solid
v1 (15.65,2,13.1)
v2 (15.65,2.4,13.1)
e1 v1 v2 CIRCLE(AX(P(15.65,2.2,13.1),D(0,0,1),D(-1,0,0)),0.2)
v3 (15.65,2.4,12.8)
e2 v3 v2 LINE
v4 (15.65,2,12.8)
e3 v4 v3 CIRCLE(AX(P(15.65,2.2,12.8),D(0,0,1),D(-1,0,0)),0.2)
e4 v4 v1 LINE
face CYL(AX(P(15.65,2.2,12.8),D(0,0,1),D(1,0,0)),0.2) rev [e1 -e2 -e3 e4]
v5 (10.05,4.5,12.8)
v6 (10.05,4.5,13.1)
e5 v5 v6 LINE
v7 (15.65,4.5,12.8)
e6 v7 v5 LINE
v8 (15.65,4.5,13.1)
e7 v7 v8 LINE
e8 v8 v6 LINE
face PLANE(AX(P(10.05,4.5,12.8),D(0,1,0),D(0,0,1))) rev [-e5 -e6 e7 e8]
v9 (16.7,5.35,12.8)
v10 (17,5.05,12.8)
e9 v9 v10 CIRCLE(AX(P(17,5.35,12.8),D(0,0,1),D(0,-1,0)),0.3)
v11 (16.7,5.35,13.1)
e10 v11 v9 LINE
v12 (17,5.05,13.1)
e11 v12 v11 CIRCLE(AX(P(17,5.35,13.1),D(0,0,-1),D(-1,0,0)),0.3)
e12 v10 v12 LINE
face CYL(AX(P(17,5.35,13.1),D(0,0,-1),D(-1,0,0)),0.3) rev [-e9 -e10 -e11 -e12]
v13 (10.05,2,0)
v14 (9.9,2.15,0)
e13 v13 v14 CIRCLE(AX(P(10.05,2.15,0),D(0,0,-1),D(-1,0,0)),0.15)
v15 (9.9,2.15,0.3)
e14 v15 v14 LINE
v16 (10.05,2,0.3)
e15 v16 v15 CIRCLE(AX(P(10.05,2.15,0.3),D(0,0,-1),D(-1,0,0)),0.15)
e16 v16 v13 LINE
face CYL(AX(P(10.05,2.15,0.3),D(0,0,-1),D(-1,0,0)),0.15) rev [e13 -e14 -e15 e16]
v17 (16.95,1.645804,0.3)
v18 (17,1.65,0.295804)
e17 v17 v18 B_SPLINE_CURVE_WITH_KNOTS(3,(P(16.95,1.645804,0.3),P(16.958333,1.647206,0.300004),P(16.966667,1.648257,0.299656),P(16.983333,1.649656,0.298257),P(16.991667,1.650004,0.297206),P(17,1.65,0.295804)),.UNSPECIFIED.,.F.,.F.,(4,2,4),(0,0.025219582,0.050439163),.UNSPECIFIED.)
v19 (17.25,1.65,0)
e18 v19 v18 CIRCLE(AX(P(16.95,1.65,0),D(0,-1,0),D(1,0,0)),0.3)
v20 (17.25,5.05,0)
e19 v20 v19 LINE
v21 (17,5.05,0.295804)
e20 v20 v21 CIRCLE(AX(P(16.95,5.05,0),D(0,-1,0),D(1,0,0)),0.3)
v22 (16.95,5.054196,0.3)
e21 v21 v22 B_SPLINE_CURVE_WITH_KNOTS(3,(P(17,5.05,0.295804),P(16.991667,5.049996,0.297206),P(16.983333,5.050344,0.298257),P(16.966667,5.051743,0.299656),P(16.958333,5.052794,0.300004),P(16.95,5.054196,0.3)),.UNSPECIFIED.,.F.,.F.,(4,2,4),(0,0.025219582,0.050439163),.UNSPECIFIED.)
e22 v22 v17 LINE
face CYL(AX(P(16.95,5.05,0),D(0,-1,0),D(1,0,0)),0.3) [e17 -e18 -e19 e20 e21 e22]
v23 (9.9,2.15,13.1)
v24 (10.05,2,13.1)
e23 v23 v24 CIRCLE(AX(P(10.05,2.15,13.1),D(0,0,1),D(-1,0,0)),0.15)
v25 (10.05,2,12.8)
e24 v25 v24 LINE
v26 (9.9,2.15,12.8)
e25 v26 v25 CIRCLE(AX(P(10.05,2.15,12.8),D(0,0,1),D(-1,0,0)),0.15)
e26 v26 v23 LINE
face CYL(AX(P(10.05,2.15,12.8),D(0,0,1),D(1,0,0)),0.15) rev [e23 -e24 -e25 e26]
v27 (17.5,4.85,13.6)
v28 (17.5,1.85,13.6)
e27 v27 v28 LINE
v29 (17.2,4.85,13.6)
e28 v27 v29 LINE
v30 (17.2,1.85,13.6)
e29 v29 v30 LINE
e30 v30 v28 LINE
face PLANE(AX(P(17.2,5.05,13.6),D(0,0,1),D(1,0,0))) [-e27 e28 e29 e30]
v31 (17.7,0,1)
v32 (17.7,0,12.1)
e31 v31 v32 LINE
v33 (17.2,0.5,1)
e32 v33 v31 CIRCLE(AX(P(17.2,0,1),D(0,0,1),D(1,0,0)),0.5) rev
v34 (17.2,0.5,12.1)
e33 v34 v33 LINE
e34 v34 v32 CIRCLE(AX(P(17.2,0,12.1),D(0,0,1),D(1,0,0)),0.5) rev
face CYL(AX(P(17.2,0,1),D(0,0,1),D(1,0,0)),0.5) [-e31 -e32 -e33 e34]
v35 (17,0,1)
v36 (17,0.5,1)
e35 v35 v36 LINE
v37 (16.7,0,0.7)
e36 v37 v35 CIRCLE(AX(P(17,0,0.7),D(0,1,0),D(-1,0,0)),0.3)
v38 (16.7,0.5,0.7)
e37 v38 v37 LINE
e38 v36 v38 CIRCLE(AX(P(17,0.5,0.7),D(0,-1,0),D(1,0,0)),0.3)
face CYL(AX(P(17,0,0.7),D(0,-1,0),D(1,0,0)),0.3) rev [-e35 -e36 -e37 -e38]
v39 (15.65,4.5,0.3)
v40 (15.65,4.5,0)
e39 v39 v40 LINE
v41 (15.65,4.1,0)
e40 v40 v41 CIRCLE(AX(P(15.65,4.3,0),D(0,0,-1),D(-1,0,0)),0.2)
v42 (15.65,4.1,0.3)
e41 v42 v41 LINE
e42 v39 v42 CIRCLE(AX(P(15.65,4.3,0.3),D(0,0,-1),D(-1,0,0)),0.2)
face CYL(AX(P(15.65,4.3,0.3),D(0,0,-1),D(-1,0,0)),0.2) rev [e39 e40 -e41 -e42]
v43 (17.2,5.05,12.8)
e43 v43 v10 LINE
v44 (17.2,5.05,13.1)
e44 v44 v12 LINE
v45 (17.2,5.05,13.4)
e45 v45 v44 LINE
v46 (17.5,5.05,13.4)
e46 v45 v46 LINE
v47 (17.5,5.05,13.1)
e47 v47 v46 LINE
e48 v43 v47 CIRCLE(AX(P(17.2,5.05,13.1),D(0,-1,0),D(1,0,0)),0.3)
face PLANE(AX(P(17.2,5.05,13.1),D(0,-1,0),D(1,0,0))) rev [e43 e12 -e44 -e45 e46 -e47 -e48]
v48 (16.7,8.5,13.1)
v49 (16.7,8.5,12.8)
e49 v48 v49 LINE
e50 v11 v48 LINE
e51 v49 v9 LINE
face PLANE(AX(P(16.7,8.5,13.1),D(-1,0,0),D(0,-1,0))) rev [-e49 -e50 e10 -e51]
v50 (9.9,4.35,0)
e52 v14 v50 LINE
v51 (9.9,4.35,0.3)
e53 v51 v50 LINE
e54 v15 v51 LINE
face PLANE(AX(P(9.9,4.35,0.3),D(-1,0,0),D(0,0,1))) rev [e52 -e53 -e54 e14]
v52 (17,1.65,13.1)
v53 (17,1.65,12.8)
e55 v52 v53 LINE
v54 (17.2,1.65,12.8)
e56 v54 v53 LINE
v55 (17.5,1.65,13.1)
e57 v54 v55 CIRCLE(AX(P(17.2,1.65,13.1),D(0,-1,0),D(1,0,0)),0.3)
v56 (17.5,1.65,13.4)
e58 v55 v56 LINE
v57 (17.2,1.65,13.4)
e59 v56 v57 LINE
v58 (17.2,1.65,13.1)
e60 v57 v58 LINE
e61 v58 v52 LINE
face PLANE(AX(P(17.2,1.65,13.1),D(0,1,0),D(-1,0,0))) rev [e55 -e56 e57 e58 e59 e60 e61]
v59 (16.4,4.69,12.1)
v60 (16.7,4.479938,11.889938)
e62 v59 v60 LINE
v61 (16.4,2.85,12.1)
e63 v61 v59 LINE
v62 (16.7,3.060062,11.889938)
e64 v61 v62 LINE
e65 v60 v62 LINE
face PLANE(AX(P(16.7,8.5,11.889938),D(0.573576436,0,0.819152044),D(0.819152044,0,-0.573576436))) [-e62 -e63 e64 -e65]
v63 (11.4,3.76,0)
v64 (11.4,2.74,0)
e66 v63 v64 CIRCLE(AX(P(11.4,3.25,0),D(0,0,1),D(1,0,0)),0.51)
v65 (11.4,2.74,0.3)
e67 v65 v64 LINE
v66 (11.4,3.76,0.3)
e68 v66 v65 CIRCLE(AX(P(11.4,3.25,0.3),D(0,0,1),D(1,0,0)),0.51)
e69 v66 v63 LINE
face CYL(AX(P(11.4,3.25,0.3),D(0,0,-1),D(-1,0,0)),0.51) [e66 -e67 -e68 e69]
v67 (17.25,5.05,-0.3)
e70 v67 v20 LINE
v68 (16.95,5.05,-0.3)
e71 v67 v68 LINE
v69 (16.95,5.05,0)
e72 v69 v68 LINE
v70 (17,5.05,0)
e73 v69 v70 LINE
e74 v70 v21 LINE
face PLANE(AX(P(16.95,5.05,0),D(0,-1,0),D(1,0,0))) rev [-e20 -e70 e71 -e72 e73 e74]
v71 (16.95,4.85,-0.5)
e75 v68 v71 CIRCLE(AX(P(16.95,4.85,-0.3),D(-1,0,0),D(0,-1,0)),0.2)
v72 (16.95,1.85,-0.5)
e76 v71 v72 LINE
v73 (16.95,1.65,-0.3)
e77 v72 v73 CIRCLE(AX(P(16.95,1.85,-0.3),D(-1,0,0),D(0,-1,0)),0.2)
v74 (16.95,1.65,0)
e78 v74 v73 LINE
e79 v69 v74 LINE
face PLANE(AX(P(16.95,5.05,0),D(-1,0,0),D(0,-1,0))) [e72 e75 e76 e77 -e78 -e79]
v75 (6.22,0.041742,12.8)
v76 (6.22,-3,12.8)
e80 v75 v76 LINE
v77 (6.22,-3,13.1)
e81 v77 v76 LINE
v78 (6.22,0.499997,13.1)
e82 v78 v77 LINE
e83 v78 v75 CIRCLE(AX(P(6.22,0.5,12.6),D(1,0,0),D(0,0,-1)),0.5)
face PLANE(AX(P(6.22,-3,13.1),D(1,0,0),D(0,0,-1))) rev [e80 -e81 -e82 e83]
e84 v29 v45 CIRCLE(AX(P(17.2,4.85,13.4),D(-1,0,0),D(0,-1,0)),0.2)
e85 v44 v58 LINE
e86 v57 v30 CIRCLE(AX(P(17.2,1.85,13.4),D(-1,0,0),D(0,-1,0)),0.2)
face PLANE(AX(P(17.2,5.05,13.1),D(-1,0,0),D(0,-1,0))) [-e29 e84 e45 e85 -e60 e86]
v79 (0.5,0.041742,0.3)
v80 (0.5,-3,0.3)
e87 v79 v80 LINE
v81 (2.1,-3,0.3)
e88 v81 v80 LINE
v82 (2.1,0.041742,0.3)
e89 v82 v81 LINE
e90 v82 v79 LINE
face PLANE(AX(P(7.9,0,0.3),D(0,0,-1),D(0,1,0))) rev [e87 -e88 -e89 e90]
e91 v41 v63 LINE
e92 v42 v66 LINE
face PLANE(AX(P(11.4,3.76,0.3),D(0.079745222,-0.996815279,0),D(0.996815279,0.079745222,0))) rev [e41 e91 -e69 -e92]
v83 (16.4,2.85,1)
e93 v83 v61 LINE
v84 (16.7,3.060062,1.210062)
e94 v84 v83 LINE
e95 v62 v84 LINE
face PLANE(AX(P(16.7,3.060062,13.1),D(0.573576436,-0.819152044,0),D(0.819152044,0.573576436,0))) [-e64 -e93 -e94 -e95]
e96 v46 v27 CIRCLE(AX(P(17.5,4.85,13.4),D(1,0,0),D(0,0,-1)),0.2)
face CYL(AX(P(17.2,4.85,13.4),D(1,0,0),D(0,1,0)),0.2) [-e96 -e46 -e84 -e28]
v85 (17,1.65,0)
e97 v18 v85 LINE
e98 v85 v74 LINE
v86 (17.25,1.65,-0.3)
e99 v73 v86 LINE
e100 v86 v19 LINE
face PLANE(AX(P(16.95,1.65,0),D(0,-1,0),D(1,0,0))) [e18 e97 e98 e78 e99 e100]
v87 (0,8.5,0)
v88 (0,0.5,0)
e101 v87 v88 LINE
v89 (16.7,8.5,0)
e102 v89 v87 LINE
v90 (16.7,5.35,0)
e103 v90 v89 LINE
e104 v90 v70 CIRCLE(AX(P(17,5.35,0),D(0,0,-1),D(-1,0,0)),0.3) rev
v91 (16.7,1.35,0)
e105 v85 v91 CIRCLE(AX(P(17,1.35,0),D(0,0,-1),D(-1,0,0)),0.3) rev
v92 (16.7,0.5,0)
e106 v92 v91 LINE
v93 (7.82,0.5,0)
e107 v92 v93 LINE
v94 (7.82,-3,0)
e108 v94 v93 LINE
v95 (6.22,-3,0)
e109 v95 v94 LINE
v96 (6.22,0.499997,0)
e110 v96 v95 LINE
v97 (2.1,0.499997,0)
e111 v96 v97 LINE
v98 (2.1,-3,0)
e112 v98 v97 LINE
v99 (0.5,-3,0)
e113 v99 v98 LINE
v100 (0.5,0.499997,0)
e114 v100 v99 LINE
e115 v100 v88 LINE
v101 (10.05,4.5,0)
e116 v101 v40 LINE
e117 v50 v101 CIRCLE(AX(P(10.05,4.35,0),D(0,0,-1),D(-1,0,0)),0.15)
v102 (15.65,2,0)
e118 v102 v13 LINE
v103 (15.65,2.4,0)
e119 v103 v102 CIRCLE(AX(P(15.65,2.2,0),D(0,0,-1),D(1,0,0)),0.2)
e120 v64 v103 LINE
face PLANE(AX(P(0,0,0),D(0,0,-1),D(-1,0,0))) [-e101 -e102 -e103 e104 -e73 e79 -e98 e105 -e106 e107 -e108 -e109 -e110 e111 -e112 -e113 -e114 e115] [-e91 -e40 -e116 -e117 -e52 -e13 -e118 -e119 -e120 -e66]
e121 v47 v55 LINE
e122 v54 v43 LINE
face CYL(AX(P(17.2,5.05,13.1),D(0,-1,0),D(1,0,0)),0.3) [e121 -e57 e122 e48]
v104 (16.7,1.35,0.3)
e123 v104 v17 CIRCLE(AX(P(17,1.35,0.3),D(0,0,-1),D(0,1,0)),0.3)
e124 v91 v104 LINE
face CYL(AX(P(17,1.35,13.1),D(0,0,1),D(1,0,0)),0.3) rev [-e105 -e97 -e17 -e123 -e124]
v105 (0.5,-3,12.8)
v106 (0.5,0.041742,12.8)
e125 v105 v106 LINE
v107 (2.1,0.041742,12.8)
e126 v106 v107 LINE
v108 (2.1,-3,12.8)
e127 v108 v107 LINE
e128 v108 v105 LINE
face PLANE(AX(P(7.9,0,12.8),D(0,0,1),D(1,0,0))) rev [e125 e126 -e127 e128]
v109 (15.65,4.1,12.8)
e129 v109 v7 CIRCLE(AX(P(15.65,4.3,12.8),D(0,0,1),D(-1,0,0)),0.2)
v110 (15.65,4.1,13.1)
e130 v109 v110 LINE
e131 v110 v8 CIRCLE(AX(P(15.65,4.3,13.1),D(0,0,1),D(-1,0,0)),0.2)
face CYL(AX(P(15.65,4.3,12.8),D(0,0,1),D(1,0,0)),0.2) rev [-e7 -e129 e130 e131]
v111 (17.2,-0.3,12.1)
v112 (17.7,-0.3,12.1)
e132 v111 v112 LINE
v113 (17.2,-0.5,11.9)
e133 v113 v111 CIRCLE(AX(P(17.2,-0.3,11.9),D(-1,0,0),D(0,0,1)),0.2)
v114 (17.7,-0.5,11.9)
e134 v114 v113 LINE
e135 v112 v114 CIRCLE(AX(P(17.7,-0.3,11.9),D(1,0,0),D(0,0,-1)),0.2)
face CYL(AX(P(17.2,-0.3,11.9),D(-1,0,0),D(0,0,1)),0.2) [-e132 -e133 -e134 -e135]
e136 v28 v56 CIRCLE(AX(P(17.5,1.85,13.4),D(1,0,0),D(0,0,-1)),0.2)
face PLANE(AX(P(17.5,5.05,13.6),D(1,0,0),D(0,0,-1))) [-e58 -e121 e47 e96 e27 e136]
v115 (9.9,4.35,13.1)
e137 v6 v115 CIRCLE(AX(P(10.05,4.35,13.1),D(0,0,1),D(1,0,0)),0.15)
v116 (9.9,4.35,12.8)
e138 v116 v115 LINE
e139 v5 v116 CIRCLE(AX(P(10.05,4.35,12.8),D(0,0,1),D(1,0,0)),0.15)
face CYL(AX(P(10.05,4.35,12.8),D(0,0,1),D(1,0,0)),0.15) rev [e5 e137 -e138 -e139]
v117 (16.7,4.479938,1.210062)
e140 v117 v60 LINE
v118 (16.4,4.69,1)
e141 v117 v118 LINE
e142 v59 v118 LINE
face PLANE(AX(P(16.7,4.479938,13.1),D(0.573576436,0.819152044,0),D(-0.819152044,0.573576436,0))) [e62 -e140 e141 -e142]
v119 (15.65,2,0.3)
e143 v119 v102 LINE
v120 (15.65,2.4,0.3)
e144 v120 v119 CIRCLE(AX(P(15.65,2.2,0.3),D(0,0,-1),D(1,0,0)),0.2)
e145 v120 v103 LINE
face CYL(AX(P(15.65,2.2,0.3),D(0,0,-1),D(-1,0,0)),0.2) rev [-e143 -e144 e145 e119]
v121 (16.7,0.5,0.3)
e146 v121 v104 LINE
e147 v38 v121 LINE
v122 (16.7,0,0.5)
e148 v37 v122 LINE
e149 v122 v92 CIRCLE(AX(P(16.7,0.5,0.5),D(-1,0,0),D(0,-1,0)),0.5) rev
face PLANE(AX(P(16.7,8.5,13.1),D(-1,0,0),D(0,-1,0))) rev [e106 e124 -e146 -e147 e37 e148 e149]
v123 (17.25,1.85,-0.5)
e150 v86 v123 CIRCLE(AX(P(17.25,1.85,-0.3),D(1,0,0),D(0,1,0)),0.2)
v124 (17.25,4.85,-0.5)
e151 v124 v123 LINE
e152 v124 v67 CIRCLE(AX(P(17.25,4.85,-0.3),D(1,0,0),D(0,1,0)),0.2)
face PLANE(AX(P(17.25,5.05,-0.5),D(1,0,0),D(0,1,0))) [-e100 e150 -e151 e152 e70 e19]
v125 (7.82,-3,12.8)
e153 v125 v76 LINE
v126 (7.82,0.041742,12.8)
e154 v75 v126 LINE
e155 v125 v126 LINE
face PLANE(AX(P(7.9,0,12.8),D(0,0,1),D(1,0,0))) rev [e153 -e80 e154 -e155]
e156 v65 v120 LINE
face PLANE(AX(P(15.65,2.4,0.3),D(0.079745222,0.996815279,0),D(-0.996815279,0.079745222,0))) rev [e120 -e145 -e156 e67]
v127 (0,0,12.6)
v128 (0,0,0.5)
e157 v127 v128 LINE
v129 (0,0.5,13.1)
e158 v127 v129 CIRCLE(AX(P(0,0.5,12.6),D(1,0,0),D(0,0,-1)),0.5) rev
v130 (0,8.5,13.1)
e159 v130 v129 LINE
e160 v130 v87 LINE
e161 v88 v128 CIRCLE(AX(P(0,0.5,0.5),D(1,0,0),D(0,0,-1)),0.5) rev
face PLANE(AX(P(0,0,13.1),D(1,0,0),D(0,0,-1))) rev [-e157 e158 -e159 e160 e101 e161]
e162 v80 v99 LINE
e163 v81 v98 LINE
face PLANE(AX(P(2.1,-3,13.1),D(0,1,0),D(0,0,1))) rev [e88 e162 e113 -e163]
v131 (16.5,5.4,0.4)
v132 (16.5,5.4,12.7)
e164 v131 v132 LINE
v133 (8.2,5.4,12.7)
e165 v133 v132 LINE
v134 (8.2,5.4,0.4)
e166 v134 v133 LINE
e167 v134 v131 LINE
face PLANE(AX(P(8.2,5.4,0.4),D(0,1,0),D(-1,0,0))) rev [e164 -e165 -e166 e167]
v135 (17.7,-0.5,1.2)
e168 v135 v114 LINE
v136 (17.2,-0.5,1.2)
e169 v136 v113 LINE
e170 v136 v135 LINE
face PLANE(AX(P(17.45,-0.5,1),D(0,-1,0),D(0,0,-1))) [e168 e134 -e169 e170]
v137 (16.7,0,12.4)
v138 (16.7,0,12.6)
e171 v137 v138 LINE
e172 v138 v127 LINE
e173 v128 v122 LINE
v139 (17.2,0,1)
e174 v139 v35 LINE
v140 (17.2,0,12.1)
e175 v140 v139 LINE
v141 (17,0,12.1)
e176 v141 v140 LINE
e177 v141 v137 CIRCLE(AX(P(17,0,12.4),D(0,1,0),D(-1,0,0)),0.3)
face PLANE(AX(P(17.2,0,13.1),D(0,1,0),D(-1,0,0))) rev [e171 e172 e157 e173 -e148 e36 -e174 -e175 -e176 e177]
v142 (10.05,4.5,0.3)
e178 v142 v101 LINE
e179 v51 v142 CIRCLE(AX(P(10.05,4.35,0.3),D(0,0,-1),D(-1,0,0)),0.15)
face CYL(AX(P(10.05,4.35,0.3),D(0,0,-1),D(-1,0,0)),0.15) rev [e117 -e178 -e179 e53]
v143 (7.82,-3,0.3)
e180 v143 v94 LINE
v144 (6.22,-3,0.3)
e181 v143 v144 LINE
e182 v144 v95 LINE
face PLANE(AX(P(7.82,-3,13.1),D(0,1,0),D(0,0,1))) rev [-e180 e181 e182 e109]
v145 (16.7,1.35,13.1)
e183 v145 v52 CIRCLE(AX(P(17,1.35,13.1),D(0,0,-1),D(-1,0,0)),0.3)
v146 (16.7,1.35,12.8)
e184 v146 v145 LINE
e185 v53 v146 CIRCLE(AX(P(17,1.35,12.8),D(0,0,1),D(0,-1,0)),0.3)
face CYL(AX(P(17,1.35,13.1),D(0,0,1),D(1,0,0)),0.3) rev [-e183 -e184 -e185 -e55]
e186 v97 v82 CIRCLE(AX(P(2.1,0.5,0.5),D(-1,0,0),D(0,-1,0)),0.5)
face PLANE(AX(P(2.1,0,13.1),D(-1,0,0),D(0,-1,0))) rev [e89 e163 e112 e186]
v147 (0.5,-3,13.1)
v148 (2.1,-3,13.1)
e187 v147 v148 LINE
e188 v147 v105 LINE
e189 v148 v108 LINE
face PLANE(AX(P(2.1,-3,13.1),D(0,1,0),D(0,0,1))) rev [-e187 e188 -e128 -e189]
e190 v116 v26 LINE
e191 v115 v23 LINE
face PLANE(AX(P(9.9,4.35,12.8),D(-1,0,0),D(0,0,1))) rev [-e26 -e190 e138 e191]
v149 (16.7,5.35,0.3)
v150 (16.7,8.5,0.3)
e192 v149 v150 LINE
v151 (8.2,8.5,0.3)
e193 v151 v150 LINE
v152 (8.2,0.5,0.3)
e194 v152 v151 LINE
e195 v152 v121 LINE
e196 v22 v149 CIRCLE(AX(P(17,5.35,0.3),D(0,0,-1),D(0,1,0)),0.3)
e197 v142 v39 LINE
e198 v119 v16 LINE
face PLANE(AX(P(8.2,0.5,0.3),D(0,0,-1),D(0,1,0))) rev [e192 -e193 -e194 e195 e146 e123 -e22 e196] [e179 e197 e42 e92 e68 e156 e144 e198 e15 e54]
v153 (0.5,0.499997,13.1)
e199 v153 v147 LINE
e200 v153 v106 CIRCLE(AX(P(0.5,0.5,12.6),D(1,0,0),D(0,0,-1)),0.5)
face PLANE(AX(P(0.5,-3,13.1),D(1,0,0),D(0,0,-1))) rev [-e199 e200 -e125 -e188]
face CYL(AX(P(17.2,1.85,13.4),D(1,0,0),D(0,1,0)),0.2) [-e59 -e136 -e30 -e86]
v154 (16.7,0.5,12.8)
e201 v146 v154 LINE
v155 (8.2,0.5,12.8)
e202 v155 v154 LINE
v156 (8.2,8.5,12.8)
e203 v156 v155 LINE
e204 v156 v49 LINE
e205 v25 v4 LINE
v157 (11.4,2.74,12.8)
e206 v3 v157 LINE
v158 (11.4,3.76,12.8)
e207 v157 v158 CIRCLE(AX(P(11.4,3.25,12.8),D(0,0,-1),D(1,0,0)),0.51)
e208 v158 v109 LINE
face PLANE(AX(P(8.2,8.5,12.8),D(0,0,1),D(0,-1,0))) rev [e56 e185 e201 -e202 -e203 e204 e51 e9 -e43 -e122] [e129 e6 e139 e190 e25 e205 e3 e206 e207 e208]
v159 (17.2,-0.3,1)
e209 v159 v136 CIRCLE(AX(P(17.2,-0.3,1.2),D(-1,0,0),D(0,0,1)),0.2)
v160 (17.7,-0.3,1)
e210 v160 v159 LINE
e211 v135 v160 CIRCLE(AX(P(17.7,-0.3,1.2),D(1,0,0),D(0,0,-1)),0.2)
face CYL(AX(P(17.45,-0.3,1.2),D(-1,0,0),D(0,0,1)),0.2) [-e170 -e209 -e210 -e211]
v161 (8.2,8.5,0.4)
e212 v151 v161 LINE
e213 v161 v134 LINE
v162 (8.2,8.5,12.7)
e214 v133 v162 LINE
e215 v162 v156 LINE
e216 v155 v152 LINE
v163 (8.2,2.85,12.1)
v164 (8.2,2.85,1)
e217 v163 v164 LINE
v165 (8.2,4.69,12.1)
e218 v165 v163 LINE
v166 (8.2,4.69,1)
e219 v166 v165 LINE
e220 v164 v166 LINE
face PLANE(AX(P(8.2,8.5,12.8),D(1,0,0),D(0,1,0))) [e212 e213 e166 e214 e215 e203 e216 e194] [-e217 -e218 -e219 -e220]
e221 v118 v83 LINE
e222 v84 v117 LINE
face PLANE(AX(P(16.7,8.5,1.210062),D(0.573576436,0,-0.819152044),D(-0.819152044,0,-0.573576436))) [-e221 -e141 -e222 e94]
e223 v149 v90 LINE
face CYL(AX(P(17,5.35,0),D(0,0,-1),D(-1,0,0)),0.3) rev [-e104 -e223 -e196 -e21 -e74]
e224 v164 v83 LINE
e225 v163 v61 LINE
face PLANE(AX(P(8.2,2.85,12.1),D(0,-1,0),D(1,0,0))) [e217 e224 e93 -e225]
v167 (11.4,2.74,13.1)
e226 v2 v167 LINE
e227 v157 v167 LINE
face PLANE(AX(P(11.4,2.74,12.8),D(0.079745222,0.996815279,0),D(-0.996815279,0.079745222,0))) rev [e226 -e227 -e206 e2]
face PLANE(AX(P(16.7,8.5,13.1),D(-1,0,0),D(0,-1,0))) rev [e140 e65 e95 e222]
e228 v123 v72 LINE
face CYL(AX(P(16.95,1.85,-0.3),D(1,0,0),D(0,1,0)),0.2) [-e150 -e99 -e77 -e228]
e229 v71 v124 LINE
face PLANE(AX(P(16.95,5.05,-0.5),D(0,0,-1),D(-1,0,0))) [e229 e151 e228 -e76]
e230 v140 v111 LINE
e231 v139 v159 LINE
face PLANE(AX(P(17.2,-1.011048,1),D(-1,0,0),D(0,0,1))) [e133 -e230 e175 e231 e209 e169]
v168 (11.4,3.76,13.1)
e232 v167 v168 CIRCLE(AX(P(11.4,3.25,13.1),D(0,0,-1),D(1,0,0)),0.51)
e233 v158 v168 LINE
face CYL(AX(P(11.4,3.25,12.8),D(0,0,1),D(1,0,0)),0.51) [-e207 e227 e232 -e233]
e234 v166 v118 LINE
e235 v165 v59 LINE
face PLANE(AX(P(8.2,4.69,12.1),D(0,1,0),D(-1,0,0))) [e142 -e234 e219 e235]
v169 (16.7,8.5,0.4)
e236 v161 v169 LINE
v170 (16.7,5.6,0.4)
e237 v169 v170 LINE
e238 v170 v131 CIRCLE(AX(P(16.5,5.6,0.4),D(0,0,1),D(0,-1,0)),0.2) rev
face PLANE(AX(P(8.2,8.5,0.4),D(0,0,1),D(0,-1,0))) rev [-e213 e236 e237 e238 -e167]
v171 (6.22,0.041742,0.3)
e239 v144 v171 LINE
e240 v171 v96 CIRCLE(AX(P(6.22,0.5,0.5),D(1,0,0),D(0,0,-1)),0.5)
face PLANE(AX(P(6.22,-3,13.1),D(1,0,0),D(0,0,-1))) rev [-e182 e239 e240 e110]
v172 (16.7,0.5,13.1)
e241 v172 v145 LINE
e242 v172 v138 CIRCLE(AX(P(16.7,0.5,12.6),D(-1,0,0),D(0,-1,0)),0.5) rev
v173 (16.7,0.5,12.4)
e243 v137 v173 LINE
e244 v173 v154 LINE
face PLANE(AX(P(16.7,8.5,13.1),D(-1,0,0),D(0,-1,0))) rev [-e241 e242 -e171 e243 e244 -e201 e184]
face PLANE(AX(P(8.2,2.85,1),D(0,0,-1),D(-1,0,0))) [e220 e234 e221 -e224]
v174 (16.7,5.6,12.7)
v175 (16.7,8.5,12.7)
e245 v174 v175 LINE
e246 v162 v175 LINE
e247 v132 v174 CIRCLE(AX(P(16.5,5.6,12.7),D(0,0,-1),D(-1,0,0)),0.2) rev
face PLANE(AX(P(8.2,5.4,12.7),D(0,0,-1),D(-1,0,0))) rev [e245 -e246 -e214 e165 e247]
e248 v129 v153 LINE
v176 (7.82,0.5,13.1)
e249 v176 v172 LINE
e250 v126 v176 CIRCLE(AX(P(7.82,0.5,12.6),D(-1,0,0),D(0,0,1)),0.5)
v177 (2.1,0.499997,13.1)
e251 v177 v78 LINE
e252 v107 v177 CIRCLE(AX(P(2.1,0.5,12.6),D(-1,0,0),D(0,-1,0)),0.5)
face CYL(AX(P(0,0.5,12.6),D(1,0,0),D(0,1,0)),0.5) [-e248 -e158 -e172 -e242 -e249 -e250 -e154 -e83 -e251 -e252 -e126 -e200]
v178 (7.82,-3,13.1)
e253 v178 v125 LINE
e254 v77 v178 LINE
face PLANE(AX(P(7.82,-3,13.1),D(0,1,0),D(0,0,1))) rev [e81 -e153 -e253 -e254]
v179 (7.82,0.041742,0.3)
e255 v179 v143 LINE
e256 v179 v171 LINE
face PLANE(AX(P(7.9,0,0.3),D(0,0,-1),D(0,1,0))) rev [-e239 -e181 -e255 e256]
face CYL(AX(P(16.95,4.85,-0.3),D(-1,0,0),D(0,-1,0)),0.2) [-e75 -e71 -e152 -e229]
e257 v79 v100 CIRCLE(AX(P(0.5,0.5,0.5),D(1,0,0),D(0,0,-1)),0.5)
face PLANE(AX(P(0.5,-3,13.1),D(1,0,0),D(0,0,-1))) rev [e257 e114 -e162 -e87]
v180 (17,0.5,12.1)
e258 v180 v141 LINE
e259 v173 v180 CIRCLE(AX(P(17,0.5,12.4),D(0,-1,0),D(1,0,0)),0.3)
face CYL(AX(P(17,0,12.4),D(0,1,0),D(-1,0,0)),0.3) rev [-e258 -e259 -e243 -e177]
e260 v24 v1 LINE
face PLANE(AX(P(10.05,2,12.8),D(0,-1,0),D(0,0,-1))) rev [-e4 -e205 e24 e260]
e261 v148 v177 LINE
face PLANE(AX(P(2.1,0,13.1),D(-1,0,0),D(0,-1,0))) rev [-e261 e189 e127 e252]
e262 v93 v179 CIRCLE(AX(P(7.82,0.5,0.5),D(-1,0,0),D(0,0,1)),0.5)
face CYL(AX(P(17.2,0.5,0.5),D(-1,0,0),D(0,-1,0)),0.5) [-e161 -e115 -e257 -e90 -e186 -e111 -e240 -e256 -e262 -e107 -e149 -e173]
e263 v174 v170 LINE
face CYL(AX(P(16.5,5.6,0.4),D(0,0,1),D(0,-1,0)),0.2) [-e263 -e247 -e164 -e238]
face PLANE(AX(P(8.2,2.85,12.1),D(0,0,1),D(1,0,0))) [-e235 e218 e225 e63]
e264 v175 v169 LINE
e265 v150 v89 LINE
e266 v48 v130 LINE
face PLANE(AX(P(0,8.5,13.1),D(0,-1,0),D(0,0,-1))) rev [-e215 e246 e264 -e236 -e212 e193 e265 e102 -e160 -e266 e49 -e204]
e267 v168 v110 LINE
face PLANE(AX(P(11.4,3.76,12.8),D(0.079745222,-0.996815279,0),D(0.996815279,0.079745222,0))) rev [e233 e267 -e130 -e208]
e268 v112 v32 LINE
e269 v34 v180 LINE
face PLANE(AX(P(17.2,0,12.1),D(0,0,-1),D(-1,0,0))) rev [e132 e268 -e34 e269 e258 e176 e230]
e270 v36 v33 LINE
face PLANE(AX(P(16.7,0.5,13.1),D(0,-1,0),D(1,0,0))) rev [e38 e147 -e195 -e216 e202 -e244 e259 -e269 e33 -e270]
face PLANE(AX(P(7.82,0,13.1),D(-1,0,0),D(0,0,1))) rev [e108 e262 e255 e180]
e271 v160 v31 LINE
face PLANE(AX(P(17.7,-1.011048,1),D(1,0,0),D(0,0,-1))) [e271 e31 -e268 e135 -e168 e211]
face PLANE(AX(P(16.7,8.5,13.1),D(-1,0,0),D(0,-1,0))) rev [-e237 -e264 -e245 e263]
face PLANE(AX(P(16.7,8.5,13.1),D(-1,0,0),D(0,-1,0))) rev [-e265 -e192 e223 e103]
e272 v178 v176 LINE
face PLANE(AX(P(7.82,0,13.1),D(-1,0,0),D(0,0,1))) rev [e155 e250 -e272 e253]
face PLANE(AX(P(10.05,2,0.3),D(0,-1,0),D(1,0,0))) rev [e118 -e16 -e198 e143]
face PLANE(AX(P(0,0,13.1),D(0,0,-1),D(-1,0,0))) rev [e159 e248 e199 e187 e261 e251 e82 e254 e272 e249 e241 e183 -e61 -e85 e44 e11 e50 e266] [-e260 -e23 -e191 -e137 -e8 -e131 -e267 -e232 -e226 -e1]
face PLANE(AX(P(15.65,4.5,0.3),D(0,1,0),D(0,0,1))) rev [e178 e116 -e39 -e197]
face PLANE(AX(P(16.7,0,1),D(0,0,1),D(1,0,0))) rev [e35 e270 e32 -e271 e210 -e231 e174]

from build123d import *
from OCP.BRepFilletAPI import BRepFilletAPI_MakeChamfer

# Parameters (mm, degrees)
BOSS_EXTRU_1_DEPTH      = 13.1
ESQUISSE2_W             = 12.5
ESQUISSE2_H             = 3
ENL_V_MAT_EXTRU_1_DEPTH = 7.4
ESQUISSE3_W             = 11.1
ESQUISSE3_H             = 1.84
ENL_V_MAT_EXTRU_2_DEPTH = 8.5
ESQUISSE4_W             = 0.3
ESQUISSE4_H             = 3.4
BOSS_EXTRU_2_DEPTH      = 0.5
BOSS_EXTRU_3_DEPTH      = 3.4
BOSS_EXTRU_4_DEPTH      = 3.4
CHANFREIN1_SIZE         = 0.3
CHANFREIN1_SIZE2        = 0.210062261
CHANFREIN2_SIZE         = 0.3
CHANFREIN2_SIZE2        = 0.210062261
CHANFREIN3_SIZE         = 0.3
CHANFREIN3_SIZE2        = 0.210062261
CONG_1_R                = 0.2
CONG_2_R                = 0.2
ESQUISSE10_W            = 0.5
ESQUISSE10_H            = 0.5
ENL_V_MAT_EXTRU_3_DEPTH = 1
ESQUISSE11_W            = 0.5
ESQUISSE11_H            = 0.5
ENL_V_MAT_EXTRU_4_DEPTH = 1
BOSS_EXTRU_5_DEPTH      = 11.1
CONG_3_R                = 0.5
CONG_4_R                = 0.5
ENL_V_MAT_EXTRU_5_DEPTH = 0.3
ENL_V_START             = -0.3
ENL_V_MAT_EXTRU_6_DEPTH = 0.3
CONG_5_R                = 0.2
CONG_6_R                = 0.3


with BuildPart() as part:
    # Esquisse1 → Boss.-Extru.1 (new body)
    with BuildSketch(Plane.XY):
        Polygon((0, 0), (0, 8.5), (16.7, 8.5), (16.7, 0.5), (17.2, 0.5), (17.2, 0), (7.82, 0), (7.82, -3), (6.22, -3), (6.22, 0), (2.1, 0), (2.1, -3), (0.5, -3), (0.5, 0), align=None)
    extrude(amount=BOSS_EXTRU_1_DEPTH)

    # Esquisse2 → Enlèv. mat.-Extru.1 (cut)
    with BuildSketch(Plane.ZY.offset(-0.5)):
        with Locations((6.55, -1.5)):
            Rectangle(ESQUISSE2_W, ESQUISSE2_H)
    extrude(amount=-ENL_V_MAT_EXTRU_1_DEPTH, mode=Mode.SUBTRACT)

    # Esquisse3 → Enlèv. mat.-Extru.2 (cut)
    with BuildSketch(Plane(origin=(16.7, 0, 0), x_dir=(0, 0, -1), z_dir=(1, 0, 0))):
        Polygon((-12.8, 8.5), (-12.8, 0.5), (-0.3, 0.5), (-0.3, 8.5), (-0.4, 8.5), (-0.4, 5.4), (-12.7, 5.4), (-12.7, 8.5), align=None)
        with Locations((-6.55, 3.77)):
            Rectangle(ESQUISSE3_W, ESQUISSE3_H, mode=Mode.SUBTRACT)
    extrude(amount=-ENL_V_MAT_EXTRU_2_DEPTH, mode=Mode.SUBTRACT)

    # Esquisse4 → Boss.-Extru.2 (add)
    with BuildSketch(Plane(origin=(16.7, 0, 0), x_dir=(0, 0, -1), z_dir=(1, 0, 0))):
        with Locations((-12.95, 3.35)):
            Rectangle(ESQUISSE4_W, ESQUISSE4_H)
    extrude(amount=BOSS_EXTRU_2_DEPTH)

    # Esquisse8 → Boss.-Extru.3 (add)
    with BuildSketch(Plane(origin=(17.2, 1.65, 13.1), x_dir=(1, 0, 0), z_dir=(0, -1, 0))):
        with BuildLine():
            Line((0, 0), (0, 0.5))
            Line((0, 0.5), (0.3, 0.5))
            Line((0.3, 0.5), (0.3, 0))
            ThreePointArc((0.3, 0), (0.212132034, -0.212132034), (0, -0.3))
            Line((0, -0.3), (0, 0))
        make_face()
    extrude(amount=-BOSS_EXTRU_3_DEPTH)

    # Esquisse9 → Boss.-Extru.4 (add)
    with BuildSketch(Plane(origin=(17.2, 1.65, 13.1), x_dir=(1, 0, 0), z_dir=(0, -1, 0))):
        with BuildLine():
            Line((-0.5, -13.1), (-0.25, -13.1))
            Line((-0.25, -13.1), (-0.25, -13.6))
            Line((-0.25, -13.6), (0.05, -13.6))
            Line((0.05, -13.6), (0.05, -13.1))
            ThreePointArc((0.05, -13.1), (-0.037867966, -12.887867966), (-0.25, -12.8))
            Line((-0.25, -12.8), (-0.5, -12.8))
            Line((-0.5, -12.8), (-0.5, -13.1))
        make_face()
    extrude(amount=-BOSS_EXTRU_4_DEPTH)

    # Chanfrein1
    chanfrein1_edges = [part.edges().sort_by_distance(p)[0] for p in [
        (16.7, 4.69, 6.55),
    ]]
    chanfrein1_side = [part.faces().sort_by_distance(p)[0] for p in [
        (12.45, 4.69, 6.55),
    ]]
    chamfer(chanfrein1_edges, length=CHANFREIN1_SIZE, length2=CHANFREIN1_SIZE2, reference=chanfrein1_side[0])

    # Chanfrein2
    chanfrein2_edges = [part.edges().sort_by_distance(p)[0] for p in [
        (16.7, 3.664968869, 1),
    ]]
    chanfrein2_side = [part.faces().sort_by_distance(p)[0] for p in [
        (12.441622268, 3.768284121, 1),
    ]]
    chamfer(chanfrein2_edges, length=CHANFREIN2_SIZE, length2=CHANFREIN2_SIZE2, reference=chanfrein2_side[0])

    # Chanfrein3: one chamfer whose edges measure the first distance from different faces: ONE call of the kernel's chamfer builder (chamfer() names one face for all edges)
    chanfrein3_edges_1 = [part.edges().sort_by_distance(p)[0] for p in [
        (16.7, 3.664968869, 12.1),
    ]]
    chanfrein3_side_1 = [part.faces().sort_by_distance(p)[0] for p in [
        (12.441622268, 3.768284121, 12.1),
    ]]
    chanfrein3_edges_2 = [part.edges().sort_by_distance(p)[0] for p in [
        (16.7, 2.85, 6.655031131),
    ]]
    chanfrein3_side_2 = [part.faces().sort_by_distance(p)[0] for p in [
        (12.448613594, 2.85, 6.551830718),
    ]]
    chanfrein3 = BRepFilletAPI_MakeChamfer(part.part.solid().wrapped)
    for e in chanfrein3_edges_1:
        chanfrein3.Add(CHANFREIN3_SIZE, CHANFREIN3_SIZE2, e.wrapped, chanfrein3_side_1[0].wrapped)  # the first distance lies on this face
    for e in chanfrein3_edges_2:
        chanfrein3.Add(CHANFREIN3_SIZE, CHANFREIN3_SIZE2, e.wrapped, chanfrein3_side_2[0].wrapped)  # the first distance lies on this face
    add(Compound.cast(chanfrein3.Shape()), mode=Mode.REPLACE)

    # Congé1
    cong_1_edges = [part.edges().sort_by_distance(p)[0] for p in [
        (16.7, 5.4, 6.55),
    ]]
    fillet(cong_1_edges, radius=CONG_1_R)

    # Congé2
    cong_2_edges = [part.edges().sort_by_distance(p)[0] for p in [
        (17.35, 5.05, 13.6),
        (17.35, 1.65, 13.6),
        (17.1, 5.05, -0.5),
        (17.1, 1.65, -0.5),
    ]]
    fillet(cong_2_edges, radius=CONG_2_R)

    # Esquisse10 → Enlèv. mat.-Extru.3 (cut)
    with BuildSketch(Plane(origin=(0, 0, 0), x_dir=(-1, 0, 0), z_dir=(0, 0, -1))):
        with Locations((-16.95, 0.25)):
            Rectangle(ESQUISSE10_W, ESQUISSE10_H)
    extrude(amount=-ENL_V_MAT_EXTRU_3_DEPTH, mode=Mode.SUBTRACT)

    # Esquisse11 → Enlèv. mat.-Extru.4 (cut)
    with BuildSketch(Plane.XY.offset(13.1)):
        with Locations((16.95, 0.25)):
            Rectangle(ESQUISSE11_W, ESQUISSE11_H)
    extrude(amount=-ENL_V_MAT_EXTRU_4_DEPTH, mode=Mode.SUBTRACT)

    # Esquisse12 → Boss.-Extru.5 (add)
    with BuildSketch(Plane.XY.offset(12.1)):
        with BuildLine():
            Line((17.2, 0.5), (17.2, 0))
            Line((17.2, 0), (17.2, -0.5))
            Line((17.2, -0.5), (17.7, -0.5))
            Line((17.7, -0.5), (17.7, 0))
            ThreePointArc((17.7, 0), (17.553553391, 0.353553391), (17.2, 0.5))
        make_face()
    extrude(amount=-BOSS_EXTRU_5_DEPTH)

    # Congé3
    # the kernel refuses this fillet: 0.5 mm, written as the material it adds along each edge
    # the kernel refuses this fillet: 0.5 mm, written as the material it takes off along each edge
    with BuildSketch(Plane(origin=(7.47, 0, 13.1), x_dir=(0, 1, 0), z_dir=(-1, 0, 0))) as cong_3_2_piece_1_section:
        with BuildLine():
            CenterArc((CONG_3_R, CONG_3_R), CONG_3_R, 180, 90)
            Line((0, CONG_3_R), (0, 0))
            Line((0, 0), (CONG_3_R, 0))
        make_face()
    cong_3_2_piece_1 = extrude(amount=6.62, mode=Mode.PRIVATE)
    cong_3_2_piece_1 = split(cong_3_2_piece_1, bisect_by=Plane(origin=(6.845, 0.012427722, 12.8), z_dir=(0, 0, -1)), keep=Keep.TOP, mode=Mode.PRIVATE)
    add(cong_3_2_piece_1, mode=Mode.SUBTRACT)
    with BuildSketch(Plane(origin=(6.22, 0, 13.1), x_dir=(0, 1, 0), z_dir=(-1, 0, 0))) as cong_3_2_piece_2:
        with BuildLine():
            CenterArc((CONG_3_R, CONG_3_R), CONG_3_R, 180, 90)
            Line((0, CONG_3_R), (0, 0))
            Line((0, 0), (CONG_3_R, 0))
        make_face()
    extrude(amount=4.12, mode=Mode.SUBTRACT)
    with BuildSketch(Plane(origin=(17.95, 0, 13.1), x_dir=(0, 1, 0), z_dir=(-1, 0, 0))) as cong_3_2_piece_3:
        with BuildLine():
            CenterArc((CONG_3_R, CONG_3_R), CONG_3_R, 180, 90)
            Line((0, CONG_3_R), (0, 0))
            Line((0, 0), (CONG_3_R, 0))
        make_face()
    extrude(amount=10.13, mode=Mode.SUBTRACT)
    with BuildSketch(Plane(origin=(17.95, 0, 13.1), x_dir=(0, 1, 0), z_dir=(-1, 0, 0))) as cong_3_2_piece_4_section:
        with BuildLine():
            CenterArc((CONG_3_R, CONG_3_R), CONG_3_R, 180, 90)
            Line((0, CONG_3_R), (0, 0))
            Line((0, 0), (CONG_3_R, 0))
        make_face()
    cong_3_2_piece_4 = extrude(amount=11.38, mode=Mode.PRIVATE)
    cong_3_2_piece_4 = split(cong_3_2_piece_4, bisect_by=Plane(origin=(7.195, 0.012427722, 12.8), z_dir=(0, 0, -1)), keep=Keep.TOP, mode=Mode.PRIVATE)
    add(cong_3_2_piece_4, mode=Mode.SUBTRACT)
    with BuildSketch(Plane(origin=(1.75, 0, 13.1), x_dir=(0, 1, 0), z_dir=(-1, 0, 0))) as cong_3_2_piece_5_section:
        with BuildLine():
            CenterArc((CONG_3_R, CONG_3_R), CONG_3_R, 180, 90)
            Line((0, CONG_3_R), (0, 0))
            Line((0, 0), (CONG_3_R, 0))
        make_face()
    cong_3_2_piece_5 = extrude(amount=3, mode=Mode.PRIVATE)
    cong_3_2_piece_5 = split(cong_3_2_piece_5, bisect_by=Plane(origin=(1.125, 0.012427722, 12.8), z_dir=(0, 0, -1)), keep=Keep.TOP, mode=Mode.PRIVATE)
    add(cong_3_2_piece_5, mode=Mode.SUBTRACT)
    with BuildSketch(Plane(origin=(0.5, 0, 13.1), x_dir=(0, 1, 0), z_dir=(-1, 0, 0))) as cong_3_2_piece_6:
        with BuildLine():
            CenterArc((CONG_3_R, CONG_3_R), CONG_3_R, 180, 90)
            Line((0, CONG_3_R), (0, 0))
            Line((0, 0), (CONG_3_R, 0))
        make_face()
    extrude(amount=1.75, mode=Mode.SUBTRACT)

    # Congé4
    # the kernel refuses this fillet: 0.5 mm, written as the material it adds along each edge
    # the kernel refuses this fillet: 0.5 mm, written as the material it takes off along each edge
    with BuildSketch(Plane(origin=(17.95, 0, 0), x_dir=(0, 1, 0), z_dir=(-1, 0, 0))) as cong_4_2_piece_1:
        with BuildLine():
            CenterArc((CONG_4_R, -CONG_4_R), CONG_4_R, 90, 90)
            Line((0, -CONG_4_R), (0, 0))
            Line((0, 0), (CONG_4_R, 0))
        make_face()
    extrude(amount=10.13, mode=Mode.SUBTRACT)
    with BuildSketch(Plane(origin=(17.95, 0, 0), x_dir=(0, 1, 0), z_dir=(-1, 0, 0))) as cong_4_2_piece_2_section:
        with BuildLine():
            CenterArc((CONG_4_R, -CONG_4_R), CONG_4_R, 90, 90)
            Line((0, -CONG_4_R), (0, 0))
            Line((0, 0), (CONG_4_R, 0))
        make_face()
    cong_4_2_piece_2 = extrude(amount=11.38, mode=Mode.PRIVATE)
    cong_4_2_piece_2 = split(cong_4_2_piece_2, bisect_by=Plane(origin=(7.195, 0.012427722, 0.3), z_dir=(0, 0, 1)), keep=Keep.TOP, mode=Mode.PRIVATE)
    add(cong_4_2_piece_2, mode=Mode.SUBTRACT)
    with BuildSketch(Plane(origin=(7.47, 0, 0), x_dir=(0, 1, 0), z_dir=(-1, 0, 0))) as cong_4_2_piece_3_section:
        with BuildLine():
            CenterArc((CONG_4_R, -CONG_4_R), CONG_4_R, 90, 90)
            Line((0, -CONG_4_R), (0, 0))
            Line((0, 0), (CONG_4_R, 0))
        make_face()
    cong_4_2_piece_3 = extrude(amount=6.62, mode=Mode.PRIVATE)
    cong_4_2_piece_3 = split(cong_4_2_piece_3, bisect_by=Plane(origin=(6.845, 0.012427722, 0.3), z_dir=(0, 0, 1)), keep=Keep.TOP, mode=Mode.PRIVATE)
    add(cong_4_2_piece_3, mode=Mode.SUBTRACT)
    with BuildSketch(Plane(origin=(6.22, 0, 0), x_dir=(0, 1, 0), z_dir=(-1, 0, 0))) as cong_4_2_piece_4:
        with BuildLine():
            CenterArc((CONG_4_R, -CONG_4_R), CONG_4_R, 90, 90)
            Line((0, -CONG_4_R), (0, 0))
            Line((0, 0), (CONG_4_R, 0))
        make_face()
    extrude(amount=4.12, mode=Mode.SUBTRACT)
    with BuildSketch(Plane(origin=(1.75, 0, 0), x_dir=(0, 1, 0), z_dir=(-1, 0, 0))) as cong_4_2_piece_5_section:
        with BuildLine():
            CenterArc((CONG_4_R, -CONG_4_R), CONG_4_R, 90, 90)
            Line((0, -CONG_4_R), (0, 0))
            Line((0, 0), (CONG_4_R, 0))
        make_face()
    cong_4_2_piece_5 = extrude(amount=3, mode=Mode.PRIVATE)
    cong_4_2_piece_5 = split(cong_4_2_piece_5, bisect_by=Plane(origin=(1.125, 0.012427722, 0.3), z_dir=(0, 0, 1)), keep=Keep.TOP, mode=Mode.PRIVATE)
    add(cong_4_2_piece_5, mode=Mode.SUBTRACT)
    with BuildSketch(Plane(origin=(0.5, 0, 0), x_dir=(0, 1, 0), z_dir=(-1, 0, 0))) as cong_4_2_piece_6:
        with BuildLine():
            CenterArc((CONG_4_R, -CONG_4_R), CONG_4_R, 90, 90)
            Line((0, -CONG_4_R), (0, 0))
            Line((0, 0), (CONG_4_R, 0))
        make_face()
    extrude(amount=1.75, mode=Mode.SUBTRACT)

    # Esquisse13 → Enlèv. mat.-Extru.5 (cut)
    with BuildSketch(Plane.XY.offset(13.1)):
        with BuildLine():
            Line((9.9, 4.35), (9.9, 2.15))
            ThreePointArc((9.9, 2.15), (9.943933983, 2.043933983), (10.05, 2))
            Line((10.05, 2), (15.65, 2))
            ThreePointArc((15.65, 2), (15.85, 2.2), (15.65, 2.4))
            Line((15.65, 2.4), (11.4, 2.74))
            ThreePointArc((11.4, 2.74), (10.89, 3.25), (11.4, 3.76))
            Line((11.4, 3.76), (15.65, 4.1))
            ThreePointArc((15.65, 4.1), (15.85, 4.3), (15.65, 4.5))
            Line((15.65, 4.5), (10.05, 4.5))
            ThreePointArc((10.05, 4.5), (9.943933983, 4.456066017), (9.9, 4.35))
        make_face()
    extrude(amount=-ENL_V_MAT_EXTRU_5_DEPTH, mode=Mode.SUBTRACT)

    # Esquisse14 → Enlèv. mat.-Extru.6 (cut)
    with BuildSketch(Plane(origin=(0, 0, 0), x_dir=(-1, 0, 0), z_dir=(0, 0, -1)).offset(ENL_V_START)):
        with BuildLine():
            Line((-15.65, 4.5), (-10.05, 4.5))
            ThreePointArc((-10.05, 4.5), (-9.943933983, 4.456066017), (-9.9, 4.35))
            Line((-9.9, 4.35), (-9.9, 2.15))
            ThreePointArc((-9.9, 2.15), (-9.943933983, 2.043933983), (-10.05, 2))
            Line((-10.05, 2), (-15.65, 2))
            ThreePointArc((-15.65, 2), (-15.85, 2.2), (-15.65, 2.4))
            Line((-15.65, 2.4), (-11.4, 2.74))
            ThreePointArc((-11.4, 2.74), (-10.89, 3.25), (-11.4, 3.76))
            Line((-11.4, 3.76), (-15.65, 4.1))
            ThreePointArc((-15.65, 4.1), (-15.85, 4.3), (-15.65, 4.5))
        make_face()
    extrude(amount=ENL_V_MAT_EXTRU_6_DEPTH, mode=Mode.SUBTRACT)

    # Congé5
    cong_5_edges = [part.edges().sort_by_distance(p)[0] for p in [
        (17.45, -0.5, 1),
        (17.45, -0.5, 12.1),
    ]]
    fillet(cong_5_edges, radius=CONG_5_R)

    # Congé6
    # the kernel refuses this fillet: 0.3 mm, written as the material it adds along each edge
    with BuildSketch(Plane(origin=(16.7, 5.05, 12.8), x_dir=(0, 1, 0), z_dir=(0, 0, 1)), Plane(origin=(16.7, 1.65, 13.1), x_dir=(0, -1, 0), z_dir=(0, 0, -1))) as cong_6_piece_1:
        with BuildLine():
            CenterArc((CONG_6_R, -CONG_6_R), CONG_6_R, 90, 90)
            Line((0, -CONG_6_R), (0, 0))
            Line((0, 0), (CONG_6_R, 0))
        make_face()
    extrude(amount=0.3)
    with BuildSketch(Plane(origin=(16.7, 1.65, 0.3), x_dir=(0, -1, 0), z_dir=(0, 0, -1))) as cong_6_piece_2_section:
        with BuildLine():
            CenterArc((CONG_6_R, -CONG_6_R), CONG_6_R, 90, 90)
            Line((0, -CONG_6_R), (0, 0))
            Line((0, 0), (CONG_6_R, 0))
        make_face()
    cong_6_piece_2 = extrude(amount=0.3, mode=Mode.PRIVATE)
    cong_6_piece_2 = split(cong_6_piece_2, bisect_by=Plane(origin=(16.95, 1.588616671, 0.116964364), z_dir=(-1, 0, 0)), keep=Keep.TOP, mode=Mode.PRIVATE)
    add(cong_6_piece_2)
    with BuildSketch(Plane(origin=(16.7, 1.65, 1.05), x_dir=(0, -1, 0), z_dir=(0, 0, -1))) as cong_6_piece_3_section:
        with BuildLine():
            CenterArc((CONG_6_R, -CONG_6_R), CONG_6_R, 90, 90)
            Line((0, -CONG_6_R), (0, 0))
            Line((0, 0), (CONG_6_R, 0))
        make_face()
    cong_6_piece_3 = extrude(amount=1.05, mode=Mode.PRIVATE)
    cong_6_piece_3 = cong_6_piece_3 & Plane(origin=(16.95, 1.648741802, 0), x_dir=(1, 0, 0), z_dir=(0, -1, 0)) * Cylinder(0.3, 4, mode=Mode.PRIVATE)
    add(cong_6_piece_3)
    with BuildSketch(Plane(origin=(16.7, 5.05, 0.3), x_dir=(0, 1, 0), z_dir=(0, 0, -1))) as cong_6_piece_4_section:
        with BuildLine():
            CenterArc((CONG_6_R, CONG_6_R), CONG_6_R, 180, 90)
            Line((0, CONG_6_R), (0, 0))
            Line((0, 0), (CONG_6_R, 0))
        make_face()
    cong_6_piece_4 = extrude(amount=0.3, mode=Mode.PRIVATE)
    cong_6_piece_4 = split(cong_6_piece_4, bisect_by=Plane(origin=(16.95, 5.111383329, 0.116964364), z_dir=(-1, 0, 0)), keep=Keep.TOP, mode=Mode.PRIVATE)
    add(cong_6_piece_4)
    with BuildSketch(Plane(origin=(16.7, 5.05, 1.05), x_dir=(0, 1, 0), z_dir=(0, 0, -1))) as cong_6_piece_5_section:
        with BuildLine():
            CenterArc((CONG_6_R, CONG_6_R), CONG_6_R, 180, 90)
            Line((0, CONG_6_R), (0, 0))
            Line((0, 0), (CONG_6_R, 0))
        make_face()
    cong_6_piece_5 = extrude(amount=1.05, mode=Mode.PRIVATE)
    cong_6_piece_5 = cong_6_piece_5 & Plane(origin=(16.95, 5.051258198, 0), x_dir=(1, 0, 0), z_dir=(0, -1, 0)) * Cylinder(0.3, 4, mode=Mode.PRIVATE)
    add(cong_6_piece_5)
    with BuildSketch(Plane(origin=(16.7, 0, 1), x_dir=(1, 0, 0), z_dir=(0, 1, 0)), Plane(origin=(16.7, 0.5, 12.1), x_dir=(1, 0, 0), z_dir=(0, -1, 0))) as cong_6_piece_6:
        with BuildLine():
            CenterArc((CONG_6_R, CONG_6_R), CONG_6_R, 180, 90)
            Line((0, CONG_6_R), (0, 0))
            Line((0, 0), (CONG_6_R, 0))
        make_face()
    extrude(amount=0.5)


solid = part.part
